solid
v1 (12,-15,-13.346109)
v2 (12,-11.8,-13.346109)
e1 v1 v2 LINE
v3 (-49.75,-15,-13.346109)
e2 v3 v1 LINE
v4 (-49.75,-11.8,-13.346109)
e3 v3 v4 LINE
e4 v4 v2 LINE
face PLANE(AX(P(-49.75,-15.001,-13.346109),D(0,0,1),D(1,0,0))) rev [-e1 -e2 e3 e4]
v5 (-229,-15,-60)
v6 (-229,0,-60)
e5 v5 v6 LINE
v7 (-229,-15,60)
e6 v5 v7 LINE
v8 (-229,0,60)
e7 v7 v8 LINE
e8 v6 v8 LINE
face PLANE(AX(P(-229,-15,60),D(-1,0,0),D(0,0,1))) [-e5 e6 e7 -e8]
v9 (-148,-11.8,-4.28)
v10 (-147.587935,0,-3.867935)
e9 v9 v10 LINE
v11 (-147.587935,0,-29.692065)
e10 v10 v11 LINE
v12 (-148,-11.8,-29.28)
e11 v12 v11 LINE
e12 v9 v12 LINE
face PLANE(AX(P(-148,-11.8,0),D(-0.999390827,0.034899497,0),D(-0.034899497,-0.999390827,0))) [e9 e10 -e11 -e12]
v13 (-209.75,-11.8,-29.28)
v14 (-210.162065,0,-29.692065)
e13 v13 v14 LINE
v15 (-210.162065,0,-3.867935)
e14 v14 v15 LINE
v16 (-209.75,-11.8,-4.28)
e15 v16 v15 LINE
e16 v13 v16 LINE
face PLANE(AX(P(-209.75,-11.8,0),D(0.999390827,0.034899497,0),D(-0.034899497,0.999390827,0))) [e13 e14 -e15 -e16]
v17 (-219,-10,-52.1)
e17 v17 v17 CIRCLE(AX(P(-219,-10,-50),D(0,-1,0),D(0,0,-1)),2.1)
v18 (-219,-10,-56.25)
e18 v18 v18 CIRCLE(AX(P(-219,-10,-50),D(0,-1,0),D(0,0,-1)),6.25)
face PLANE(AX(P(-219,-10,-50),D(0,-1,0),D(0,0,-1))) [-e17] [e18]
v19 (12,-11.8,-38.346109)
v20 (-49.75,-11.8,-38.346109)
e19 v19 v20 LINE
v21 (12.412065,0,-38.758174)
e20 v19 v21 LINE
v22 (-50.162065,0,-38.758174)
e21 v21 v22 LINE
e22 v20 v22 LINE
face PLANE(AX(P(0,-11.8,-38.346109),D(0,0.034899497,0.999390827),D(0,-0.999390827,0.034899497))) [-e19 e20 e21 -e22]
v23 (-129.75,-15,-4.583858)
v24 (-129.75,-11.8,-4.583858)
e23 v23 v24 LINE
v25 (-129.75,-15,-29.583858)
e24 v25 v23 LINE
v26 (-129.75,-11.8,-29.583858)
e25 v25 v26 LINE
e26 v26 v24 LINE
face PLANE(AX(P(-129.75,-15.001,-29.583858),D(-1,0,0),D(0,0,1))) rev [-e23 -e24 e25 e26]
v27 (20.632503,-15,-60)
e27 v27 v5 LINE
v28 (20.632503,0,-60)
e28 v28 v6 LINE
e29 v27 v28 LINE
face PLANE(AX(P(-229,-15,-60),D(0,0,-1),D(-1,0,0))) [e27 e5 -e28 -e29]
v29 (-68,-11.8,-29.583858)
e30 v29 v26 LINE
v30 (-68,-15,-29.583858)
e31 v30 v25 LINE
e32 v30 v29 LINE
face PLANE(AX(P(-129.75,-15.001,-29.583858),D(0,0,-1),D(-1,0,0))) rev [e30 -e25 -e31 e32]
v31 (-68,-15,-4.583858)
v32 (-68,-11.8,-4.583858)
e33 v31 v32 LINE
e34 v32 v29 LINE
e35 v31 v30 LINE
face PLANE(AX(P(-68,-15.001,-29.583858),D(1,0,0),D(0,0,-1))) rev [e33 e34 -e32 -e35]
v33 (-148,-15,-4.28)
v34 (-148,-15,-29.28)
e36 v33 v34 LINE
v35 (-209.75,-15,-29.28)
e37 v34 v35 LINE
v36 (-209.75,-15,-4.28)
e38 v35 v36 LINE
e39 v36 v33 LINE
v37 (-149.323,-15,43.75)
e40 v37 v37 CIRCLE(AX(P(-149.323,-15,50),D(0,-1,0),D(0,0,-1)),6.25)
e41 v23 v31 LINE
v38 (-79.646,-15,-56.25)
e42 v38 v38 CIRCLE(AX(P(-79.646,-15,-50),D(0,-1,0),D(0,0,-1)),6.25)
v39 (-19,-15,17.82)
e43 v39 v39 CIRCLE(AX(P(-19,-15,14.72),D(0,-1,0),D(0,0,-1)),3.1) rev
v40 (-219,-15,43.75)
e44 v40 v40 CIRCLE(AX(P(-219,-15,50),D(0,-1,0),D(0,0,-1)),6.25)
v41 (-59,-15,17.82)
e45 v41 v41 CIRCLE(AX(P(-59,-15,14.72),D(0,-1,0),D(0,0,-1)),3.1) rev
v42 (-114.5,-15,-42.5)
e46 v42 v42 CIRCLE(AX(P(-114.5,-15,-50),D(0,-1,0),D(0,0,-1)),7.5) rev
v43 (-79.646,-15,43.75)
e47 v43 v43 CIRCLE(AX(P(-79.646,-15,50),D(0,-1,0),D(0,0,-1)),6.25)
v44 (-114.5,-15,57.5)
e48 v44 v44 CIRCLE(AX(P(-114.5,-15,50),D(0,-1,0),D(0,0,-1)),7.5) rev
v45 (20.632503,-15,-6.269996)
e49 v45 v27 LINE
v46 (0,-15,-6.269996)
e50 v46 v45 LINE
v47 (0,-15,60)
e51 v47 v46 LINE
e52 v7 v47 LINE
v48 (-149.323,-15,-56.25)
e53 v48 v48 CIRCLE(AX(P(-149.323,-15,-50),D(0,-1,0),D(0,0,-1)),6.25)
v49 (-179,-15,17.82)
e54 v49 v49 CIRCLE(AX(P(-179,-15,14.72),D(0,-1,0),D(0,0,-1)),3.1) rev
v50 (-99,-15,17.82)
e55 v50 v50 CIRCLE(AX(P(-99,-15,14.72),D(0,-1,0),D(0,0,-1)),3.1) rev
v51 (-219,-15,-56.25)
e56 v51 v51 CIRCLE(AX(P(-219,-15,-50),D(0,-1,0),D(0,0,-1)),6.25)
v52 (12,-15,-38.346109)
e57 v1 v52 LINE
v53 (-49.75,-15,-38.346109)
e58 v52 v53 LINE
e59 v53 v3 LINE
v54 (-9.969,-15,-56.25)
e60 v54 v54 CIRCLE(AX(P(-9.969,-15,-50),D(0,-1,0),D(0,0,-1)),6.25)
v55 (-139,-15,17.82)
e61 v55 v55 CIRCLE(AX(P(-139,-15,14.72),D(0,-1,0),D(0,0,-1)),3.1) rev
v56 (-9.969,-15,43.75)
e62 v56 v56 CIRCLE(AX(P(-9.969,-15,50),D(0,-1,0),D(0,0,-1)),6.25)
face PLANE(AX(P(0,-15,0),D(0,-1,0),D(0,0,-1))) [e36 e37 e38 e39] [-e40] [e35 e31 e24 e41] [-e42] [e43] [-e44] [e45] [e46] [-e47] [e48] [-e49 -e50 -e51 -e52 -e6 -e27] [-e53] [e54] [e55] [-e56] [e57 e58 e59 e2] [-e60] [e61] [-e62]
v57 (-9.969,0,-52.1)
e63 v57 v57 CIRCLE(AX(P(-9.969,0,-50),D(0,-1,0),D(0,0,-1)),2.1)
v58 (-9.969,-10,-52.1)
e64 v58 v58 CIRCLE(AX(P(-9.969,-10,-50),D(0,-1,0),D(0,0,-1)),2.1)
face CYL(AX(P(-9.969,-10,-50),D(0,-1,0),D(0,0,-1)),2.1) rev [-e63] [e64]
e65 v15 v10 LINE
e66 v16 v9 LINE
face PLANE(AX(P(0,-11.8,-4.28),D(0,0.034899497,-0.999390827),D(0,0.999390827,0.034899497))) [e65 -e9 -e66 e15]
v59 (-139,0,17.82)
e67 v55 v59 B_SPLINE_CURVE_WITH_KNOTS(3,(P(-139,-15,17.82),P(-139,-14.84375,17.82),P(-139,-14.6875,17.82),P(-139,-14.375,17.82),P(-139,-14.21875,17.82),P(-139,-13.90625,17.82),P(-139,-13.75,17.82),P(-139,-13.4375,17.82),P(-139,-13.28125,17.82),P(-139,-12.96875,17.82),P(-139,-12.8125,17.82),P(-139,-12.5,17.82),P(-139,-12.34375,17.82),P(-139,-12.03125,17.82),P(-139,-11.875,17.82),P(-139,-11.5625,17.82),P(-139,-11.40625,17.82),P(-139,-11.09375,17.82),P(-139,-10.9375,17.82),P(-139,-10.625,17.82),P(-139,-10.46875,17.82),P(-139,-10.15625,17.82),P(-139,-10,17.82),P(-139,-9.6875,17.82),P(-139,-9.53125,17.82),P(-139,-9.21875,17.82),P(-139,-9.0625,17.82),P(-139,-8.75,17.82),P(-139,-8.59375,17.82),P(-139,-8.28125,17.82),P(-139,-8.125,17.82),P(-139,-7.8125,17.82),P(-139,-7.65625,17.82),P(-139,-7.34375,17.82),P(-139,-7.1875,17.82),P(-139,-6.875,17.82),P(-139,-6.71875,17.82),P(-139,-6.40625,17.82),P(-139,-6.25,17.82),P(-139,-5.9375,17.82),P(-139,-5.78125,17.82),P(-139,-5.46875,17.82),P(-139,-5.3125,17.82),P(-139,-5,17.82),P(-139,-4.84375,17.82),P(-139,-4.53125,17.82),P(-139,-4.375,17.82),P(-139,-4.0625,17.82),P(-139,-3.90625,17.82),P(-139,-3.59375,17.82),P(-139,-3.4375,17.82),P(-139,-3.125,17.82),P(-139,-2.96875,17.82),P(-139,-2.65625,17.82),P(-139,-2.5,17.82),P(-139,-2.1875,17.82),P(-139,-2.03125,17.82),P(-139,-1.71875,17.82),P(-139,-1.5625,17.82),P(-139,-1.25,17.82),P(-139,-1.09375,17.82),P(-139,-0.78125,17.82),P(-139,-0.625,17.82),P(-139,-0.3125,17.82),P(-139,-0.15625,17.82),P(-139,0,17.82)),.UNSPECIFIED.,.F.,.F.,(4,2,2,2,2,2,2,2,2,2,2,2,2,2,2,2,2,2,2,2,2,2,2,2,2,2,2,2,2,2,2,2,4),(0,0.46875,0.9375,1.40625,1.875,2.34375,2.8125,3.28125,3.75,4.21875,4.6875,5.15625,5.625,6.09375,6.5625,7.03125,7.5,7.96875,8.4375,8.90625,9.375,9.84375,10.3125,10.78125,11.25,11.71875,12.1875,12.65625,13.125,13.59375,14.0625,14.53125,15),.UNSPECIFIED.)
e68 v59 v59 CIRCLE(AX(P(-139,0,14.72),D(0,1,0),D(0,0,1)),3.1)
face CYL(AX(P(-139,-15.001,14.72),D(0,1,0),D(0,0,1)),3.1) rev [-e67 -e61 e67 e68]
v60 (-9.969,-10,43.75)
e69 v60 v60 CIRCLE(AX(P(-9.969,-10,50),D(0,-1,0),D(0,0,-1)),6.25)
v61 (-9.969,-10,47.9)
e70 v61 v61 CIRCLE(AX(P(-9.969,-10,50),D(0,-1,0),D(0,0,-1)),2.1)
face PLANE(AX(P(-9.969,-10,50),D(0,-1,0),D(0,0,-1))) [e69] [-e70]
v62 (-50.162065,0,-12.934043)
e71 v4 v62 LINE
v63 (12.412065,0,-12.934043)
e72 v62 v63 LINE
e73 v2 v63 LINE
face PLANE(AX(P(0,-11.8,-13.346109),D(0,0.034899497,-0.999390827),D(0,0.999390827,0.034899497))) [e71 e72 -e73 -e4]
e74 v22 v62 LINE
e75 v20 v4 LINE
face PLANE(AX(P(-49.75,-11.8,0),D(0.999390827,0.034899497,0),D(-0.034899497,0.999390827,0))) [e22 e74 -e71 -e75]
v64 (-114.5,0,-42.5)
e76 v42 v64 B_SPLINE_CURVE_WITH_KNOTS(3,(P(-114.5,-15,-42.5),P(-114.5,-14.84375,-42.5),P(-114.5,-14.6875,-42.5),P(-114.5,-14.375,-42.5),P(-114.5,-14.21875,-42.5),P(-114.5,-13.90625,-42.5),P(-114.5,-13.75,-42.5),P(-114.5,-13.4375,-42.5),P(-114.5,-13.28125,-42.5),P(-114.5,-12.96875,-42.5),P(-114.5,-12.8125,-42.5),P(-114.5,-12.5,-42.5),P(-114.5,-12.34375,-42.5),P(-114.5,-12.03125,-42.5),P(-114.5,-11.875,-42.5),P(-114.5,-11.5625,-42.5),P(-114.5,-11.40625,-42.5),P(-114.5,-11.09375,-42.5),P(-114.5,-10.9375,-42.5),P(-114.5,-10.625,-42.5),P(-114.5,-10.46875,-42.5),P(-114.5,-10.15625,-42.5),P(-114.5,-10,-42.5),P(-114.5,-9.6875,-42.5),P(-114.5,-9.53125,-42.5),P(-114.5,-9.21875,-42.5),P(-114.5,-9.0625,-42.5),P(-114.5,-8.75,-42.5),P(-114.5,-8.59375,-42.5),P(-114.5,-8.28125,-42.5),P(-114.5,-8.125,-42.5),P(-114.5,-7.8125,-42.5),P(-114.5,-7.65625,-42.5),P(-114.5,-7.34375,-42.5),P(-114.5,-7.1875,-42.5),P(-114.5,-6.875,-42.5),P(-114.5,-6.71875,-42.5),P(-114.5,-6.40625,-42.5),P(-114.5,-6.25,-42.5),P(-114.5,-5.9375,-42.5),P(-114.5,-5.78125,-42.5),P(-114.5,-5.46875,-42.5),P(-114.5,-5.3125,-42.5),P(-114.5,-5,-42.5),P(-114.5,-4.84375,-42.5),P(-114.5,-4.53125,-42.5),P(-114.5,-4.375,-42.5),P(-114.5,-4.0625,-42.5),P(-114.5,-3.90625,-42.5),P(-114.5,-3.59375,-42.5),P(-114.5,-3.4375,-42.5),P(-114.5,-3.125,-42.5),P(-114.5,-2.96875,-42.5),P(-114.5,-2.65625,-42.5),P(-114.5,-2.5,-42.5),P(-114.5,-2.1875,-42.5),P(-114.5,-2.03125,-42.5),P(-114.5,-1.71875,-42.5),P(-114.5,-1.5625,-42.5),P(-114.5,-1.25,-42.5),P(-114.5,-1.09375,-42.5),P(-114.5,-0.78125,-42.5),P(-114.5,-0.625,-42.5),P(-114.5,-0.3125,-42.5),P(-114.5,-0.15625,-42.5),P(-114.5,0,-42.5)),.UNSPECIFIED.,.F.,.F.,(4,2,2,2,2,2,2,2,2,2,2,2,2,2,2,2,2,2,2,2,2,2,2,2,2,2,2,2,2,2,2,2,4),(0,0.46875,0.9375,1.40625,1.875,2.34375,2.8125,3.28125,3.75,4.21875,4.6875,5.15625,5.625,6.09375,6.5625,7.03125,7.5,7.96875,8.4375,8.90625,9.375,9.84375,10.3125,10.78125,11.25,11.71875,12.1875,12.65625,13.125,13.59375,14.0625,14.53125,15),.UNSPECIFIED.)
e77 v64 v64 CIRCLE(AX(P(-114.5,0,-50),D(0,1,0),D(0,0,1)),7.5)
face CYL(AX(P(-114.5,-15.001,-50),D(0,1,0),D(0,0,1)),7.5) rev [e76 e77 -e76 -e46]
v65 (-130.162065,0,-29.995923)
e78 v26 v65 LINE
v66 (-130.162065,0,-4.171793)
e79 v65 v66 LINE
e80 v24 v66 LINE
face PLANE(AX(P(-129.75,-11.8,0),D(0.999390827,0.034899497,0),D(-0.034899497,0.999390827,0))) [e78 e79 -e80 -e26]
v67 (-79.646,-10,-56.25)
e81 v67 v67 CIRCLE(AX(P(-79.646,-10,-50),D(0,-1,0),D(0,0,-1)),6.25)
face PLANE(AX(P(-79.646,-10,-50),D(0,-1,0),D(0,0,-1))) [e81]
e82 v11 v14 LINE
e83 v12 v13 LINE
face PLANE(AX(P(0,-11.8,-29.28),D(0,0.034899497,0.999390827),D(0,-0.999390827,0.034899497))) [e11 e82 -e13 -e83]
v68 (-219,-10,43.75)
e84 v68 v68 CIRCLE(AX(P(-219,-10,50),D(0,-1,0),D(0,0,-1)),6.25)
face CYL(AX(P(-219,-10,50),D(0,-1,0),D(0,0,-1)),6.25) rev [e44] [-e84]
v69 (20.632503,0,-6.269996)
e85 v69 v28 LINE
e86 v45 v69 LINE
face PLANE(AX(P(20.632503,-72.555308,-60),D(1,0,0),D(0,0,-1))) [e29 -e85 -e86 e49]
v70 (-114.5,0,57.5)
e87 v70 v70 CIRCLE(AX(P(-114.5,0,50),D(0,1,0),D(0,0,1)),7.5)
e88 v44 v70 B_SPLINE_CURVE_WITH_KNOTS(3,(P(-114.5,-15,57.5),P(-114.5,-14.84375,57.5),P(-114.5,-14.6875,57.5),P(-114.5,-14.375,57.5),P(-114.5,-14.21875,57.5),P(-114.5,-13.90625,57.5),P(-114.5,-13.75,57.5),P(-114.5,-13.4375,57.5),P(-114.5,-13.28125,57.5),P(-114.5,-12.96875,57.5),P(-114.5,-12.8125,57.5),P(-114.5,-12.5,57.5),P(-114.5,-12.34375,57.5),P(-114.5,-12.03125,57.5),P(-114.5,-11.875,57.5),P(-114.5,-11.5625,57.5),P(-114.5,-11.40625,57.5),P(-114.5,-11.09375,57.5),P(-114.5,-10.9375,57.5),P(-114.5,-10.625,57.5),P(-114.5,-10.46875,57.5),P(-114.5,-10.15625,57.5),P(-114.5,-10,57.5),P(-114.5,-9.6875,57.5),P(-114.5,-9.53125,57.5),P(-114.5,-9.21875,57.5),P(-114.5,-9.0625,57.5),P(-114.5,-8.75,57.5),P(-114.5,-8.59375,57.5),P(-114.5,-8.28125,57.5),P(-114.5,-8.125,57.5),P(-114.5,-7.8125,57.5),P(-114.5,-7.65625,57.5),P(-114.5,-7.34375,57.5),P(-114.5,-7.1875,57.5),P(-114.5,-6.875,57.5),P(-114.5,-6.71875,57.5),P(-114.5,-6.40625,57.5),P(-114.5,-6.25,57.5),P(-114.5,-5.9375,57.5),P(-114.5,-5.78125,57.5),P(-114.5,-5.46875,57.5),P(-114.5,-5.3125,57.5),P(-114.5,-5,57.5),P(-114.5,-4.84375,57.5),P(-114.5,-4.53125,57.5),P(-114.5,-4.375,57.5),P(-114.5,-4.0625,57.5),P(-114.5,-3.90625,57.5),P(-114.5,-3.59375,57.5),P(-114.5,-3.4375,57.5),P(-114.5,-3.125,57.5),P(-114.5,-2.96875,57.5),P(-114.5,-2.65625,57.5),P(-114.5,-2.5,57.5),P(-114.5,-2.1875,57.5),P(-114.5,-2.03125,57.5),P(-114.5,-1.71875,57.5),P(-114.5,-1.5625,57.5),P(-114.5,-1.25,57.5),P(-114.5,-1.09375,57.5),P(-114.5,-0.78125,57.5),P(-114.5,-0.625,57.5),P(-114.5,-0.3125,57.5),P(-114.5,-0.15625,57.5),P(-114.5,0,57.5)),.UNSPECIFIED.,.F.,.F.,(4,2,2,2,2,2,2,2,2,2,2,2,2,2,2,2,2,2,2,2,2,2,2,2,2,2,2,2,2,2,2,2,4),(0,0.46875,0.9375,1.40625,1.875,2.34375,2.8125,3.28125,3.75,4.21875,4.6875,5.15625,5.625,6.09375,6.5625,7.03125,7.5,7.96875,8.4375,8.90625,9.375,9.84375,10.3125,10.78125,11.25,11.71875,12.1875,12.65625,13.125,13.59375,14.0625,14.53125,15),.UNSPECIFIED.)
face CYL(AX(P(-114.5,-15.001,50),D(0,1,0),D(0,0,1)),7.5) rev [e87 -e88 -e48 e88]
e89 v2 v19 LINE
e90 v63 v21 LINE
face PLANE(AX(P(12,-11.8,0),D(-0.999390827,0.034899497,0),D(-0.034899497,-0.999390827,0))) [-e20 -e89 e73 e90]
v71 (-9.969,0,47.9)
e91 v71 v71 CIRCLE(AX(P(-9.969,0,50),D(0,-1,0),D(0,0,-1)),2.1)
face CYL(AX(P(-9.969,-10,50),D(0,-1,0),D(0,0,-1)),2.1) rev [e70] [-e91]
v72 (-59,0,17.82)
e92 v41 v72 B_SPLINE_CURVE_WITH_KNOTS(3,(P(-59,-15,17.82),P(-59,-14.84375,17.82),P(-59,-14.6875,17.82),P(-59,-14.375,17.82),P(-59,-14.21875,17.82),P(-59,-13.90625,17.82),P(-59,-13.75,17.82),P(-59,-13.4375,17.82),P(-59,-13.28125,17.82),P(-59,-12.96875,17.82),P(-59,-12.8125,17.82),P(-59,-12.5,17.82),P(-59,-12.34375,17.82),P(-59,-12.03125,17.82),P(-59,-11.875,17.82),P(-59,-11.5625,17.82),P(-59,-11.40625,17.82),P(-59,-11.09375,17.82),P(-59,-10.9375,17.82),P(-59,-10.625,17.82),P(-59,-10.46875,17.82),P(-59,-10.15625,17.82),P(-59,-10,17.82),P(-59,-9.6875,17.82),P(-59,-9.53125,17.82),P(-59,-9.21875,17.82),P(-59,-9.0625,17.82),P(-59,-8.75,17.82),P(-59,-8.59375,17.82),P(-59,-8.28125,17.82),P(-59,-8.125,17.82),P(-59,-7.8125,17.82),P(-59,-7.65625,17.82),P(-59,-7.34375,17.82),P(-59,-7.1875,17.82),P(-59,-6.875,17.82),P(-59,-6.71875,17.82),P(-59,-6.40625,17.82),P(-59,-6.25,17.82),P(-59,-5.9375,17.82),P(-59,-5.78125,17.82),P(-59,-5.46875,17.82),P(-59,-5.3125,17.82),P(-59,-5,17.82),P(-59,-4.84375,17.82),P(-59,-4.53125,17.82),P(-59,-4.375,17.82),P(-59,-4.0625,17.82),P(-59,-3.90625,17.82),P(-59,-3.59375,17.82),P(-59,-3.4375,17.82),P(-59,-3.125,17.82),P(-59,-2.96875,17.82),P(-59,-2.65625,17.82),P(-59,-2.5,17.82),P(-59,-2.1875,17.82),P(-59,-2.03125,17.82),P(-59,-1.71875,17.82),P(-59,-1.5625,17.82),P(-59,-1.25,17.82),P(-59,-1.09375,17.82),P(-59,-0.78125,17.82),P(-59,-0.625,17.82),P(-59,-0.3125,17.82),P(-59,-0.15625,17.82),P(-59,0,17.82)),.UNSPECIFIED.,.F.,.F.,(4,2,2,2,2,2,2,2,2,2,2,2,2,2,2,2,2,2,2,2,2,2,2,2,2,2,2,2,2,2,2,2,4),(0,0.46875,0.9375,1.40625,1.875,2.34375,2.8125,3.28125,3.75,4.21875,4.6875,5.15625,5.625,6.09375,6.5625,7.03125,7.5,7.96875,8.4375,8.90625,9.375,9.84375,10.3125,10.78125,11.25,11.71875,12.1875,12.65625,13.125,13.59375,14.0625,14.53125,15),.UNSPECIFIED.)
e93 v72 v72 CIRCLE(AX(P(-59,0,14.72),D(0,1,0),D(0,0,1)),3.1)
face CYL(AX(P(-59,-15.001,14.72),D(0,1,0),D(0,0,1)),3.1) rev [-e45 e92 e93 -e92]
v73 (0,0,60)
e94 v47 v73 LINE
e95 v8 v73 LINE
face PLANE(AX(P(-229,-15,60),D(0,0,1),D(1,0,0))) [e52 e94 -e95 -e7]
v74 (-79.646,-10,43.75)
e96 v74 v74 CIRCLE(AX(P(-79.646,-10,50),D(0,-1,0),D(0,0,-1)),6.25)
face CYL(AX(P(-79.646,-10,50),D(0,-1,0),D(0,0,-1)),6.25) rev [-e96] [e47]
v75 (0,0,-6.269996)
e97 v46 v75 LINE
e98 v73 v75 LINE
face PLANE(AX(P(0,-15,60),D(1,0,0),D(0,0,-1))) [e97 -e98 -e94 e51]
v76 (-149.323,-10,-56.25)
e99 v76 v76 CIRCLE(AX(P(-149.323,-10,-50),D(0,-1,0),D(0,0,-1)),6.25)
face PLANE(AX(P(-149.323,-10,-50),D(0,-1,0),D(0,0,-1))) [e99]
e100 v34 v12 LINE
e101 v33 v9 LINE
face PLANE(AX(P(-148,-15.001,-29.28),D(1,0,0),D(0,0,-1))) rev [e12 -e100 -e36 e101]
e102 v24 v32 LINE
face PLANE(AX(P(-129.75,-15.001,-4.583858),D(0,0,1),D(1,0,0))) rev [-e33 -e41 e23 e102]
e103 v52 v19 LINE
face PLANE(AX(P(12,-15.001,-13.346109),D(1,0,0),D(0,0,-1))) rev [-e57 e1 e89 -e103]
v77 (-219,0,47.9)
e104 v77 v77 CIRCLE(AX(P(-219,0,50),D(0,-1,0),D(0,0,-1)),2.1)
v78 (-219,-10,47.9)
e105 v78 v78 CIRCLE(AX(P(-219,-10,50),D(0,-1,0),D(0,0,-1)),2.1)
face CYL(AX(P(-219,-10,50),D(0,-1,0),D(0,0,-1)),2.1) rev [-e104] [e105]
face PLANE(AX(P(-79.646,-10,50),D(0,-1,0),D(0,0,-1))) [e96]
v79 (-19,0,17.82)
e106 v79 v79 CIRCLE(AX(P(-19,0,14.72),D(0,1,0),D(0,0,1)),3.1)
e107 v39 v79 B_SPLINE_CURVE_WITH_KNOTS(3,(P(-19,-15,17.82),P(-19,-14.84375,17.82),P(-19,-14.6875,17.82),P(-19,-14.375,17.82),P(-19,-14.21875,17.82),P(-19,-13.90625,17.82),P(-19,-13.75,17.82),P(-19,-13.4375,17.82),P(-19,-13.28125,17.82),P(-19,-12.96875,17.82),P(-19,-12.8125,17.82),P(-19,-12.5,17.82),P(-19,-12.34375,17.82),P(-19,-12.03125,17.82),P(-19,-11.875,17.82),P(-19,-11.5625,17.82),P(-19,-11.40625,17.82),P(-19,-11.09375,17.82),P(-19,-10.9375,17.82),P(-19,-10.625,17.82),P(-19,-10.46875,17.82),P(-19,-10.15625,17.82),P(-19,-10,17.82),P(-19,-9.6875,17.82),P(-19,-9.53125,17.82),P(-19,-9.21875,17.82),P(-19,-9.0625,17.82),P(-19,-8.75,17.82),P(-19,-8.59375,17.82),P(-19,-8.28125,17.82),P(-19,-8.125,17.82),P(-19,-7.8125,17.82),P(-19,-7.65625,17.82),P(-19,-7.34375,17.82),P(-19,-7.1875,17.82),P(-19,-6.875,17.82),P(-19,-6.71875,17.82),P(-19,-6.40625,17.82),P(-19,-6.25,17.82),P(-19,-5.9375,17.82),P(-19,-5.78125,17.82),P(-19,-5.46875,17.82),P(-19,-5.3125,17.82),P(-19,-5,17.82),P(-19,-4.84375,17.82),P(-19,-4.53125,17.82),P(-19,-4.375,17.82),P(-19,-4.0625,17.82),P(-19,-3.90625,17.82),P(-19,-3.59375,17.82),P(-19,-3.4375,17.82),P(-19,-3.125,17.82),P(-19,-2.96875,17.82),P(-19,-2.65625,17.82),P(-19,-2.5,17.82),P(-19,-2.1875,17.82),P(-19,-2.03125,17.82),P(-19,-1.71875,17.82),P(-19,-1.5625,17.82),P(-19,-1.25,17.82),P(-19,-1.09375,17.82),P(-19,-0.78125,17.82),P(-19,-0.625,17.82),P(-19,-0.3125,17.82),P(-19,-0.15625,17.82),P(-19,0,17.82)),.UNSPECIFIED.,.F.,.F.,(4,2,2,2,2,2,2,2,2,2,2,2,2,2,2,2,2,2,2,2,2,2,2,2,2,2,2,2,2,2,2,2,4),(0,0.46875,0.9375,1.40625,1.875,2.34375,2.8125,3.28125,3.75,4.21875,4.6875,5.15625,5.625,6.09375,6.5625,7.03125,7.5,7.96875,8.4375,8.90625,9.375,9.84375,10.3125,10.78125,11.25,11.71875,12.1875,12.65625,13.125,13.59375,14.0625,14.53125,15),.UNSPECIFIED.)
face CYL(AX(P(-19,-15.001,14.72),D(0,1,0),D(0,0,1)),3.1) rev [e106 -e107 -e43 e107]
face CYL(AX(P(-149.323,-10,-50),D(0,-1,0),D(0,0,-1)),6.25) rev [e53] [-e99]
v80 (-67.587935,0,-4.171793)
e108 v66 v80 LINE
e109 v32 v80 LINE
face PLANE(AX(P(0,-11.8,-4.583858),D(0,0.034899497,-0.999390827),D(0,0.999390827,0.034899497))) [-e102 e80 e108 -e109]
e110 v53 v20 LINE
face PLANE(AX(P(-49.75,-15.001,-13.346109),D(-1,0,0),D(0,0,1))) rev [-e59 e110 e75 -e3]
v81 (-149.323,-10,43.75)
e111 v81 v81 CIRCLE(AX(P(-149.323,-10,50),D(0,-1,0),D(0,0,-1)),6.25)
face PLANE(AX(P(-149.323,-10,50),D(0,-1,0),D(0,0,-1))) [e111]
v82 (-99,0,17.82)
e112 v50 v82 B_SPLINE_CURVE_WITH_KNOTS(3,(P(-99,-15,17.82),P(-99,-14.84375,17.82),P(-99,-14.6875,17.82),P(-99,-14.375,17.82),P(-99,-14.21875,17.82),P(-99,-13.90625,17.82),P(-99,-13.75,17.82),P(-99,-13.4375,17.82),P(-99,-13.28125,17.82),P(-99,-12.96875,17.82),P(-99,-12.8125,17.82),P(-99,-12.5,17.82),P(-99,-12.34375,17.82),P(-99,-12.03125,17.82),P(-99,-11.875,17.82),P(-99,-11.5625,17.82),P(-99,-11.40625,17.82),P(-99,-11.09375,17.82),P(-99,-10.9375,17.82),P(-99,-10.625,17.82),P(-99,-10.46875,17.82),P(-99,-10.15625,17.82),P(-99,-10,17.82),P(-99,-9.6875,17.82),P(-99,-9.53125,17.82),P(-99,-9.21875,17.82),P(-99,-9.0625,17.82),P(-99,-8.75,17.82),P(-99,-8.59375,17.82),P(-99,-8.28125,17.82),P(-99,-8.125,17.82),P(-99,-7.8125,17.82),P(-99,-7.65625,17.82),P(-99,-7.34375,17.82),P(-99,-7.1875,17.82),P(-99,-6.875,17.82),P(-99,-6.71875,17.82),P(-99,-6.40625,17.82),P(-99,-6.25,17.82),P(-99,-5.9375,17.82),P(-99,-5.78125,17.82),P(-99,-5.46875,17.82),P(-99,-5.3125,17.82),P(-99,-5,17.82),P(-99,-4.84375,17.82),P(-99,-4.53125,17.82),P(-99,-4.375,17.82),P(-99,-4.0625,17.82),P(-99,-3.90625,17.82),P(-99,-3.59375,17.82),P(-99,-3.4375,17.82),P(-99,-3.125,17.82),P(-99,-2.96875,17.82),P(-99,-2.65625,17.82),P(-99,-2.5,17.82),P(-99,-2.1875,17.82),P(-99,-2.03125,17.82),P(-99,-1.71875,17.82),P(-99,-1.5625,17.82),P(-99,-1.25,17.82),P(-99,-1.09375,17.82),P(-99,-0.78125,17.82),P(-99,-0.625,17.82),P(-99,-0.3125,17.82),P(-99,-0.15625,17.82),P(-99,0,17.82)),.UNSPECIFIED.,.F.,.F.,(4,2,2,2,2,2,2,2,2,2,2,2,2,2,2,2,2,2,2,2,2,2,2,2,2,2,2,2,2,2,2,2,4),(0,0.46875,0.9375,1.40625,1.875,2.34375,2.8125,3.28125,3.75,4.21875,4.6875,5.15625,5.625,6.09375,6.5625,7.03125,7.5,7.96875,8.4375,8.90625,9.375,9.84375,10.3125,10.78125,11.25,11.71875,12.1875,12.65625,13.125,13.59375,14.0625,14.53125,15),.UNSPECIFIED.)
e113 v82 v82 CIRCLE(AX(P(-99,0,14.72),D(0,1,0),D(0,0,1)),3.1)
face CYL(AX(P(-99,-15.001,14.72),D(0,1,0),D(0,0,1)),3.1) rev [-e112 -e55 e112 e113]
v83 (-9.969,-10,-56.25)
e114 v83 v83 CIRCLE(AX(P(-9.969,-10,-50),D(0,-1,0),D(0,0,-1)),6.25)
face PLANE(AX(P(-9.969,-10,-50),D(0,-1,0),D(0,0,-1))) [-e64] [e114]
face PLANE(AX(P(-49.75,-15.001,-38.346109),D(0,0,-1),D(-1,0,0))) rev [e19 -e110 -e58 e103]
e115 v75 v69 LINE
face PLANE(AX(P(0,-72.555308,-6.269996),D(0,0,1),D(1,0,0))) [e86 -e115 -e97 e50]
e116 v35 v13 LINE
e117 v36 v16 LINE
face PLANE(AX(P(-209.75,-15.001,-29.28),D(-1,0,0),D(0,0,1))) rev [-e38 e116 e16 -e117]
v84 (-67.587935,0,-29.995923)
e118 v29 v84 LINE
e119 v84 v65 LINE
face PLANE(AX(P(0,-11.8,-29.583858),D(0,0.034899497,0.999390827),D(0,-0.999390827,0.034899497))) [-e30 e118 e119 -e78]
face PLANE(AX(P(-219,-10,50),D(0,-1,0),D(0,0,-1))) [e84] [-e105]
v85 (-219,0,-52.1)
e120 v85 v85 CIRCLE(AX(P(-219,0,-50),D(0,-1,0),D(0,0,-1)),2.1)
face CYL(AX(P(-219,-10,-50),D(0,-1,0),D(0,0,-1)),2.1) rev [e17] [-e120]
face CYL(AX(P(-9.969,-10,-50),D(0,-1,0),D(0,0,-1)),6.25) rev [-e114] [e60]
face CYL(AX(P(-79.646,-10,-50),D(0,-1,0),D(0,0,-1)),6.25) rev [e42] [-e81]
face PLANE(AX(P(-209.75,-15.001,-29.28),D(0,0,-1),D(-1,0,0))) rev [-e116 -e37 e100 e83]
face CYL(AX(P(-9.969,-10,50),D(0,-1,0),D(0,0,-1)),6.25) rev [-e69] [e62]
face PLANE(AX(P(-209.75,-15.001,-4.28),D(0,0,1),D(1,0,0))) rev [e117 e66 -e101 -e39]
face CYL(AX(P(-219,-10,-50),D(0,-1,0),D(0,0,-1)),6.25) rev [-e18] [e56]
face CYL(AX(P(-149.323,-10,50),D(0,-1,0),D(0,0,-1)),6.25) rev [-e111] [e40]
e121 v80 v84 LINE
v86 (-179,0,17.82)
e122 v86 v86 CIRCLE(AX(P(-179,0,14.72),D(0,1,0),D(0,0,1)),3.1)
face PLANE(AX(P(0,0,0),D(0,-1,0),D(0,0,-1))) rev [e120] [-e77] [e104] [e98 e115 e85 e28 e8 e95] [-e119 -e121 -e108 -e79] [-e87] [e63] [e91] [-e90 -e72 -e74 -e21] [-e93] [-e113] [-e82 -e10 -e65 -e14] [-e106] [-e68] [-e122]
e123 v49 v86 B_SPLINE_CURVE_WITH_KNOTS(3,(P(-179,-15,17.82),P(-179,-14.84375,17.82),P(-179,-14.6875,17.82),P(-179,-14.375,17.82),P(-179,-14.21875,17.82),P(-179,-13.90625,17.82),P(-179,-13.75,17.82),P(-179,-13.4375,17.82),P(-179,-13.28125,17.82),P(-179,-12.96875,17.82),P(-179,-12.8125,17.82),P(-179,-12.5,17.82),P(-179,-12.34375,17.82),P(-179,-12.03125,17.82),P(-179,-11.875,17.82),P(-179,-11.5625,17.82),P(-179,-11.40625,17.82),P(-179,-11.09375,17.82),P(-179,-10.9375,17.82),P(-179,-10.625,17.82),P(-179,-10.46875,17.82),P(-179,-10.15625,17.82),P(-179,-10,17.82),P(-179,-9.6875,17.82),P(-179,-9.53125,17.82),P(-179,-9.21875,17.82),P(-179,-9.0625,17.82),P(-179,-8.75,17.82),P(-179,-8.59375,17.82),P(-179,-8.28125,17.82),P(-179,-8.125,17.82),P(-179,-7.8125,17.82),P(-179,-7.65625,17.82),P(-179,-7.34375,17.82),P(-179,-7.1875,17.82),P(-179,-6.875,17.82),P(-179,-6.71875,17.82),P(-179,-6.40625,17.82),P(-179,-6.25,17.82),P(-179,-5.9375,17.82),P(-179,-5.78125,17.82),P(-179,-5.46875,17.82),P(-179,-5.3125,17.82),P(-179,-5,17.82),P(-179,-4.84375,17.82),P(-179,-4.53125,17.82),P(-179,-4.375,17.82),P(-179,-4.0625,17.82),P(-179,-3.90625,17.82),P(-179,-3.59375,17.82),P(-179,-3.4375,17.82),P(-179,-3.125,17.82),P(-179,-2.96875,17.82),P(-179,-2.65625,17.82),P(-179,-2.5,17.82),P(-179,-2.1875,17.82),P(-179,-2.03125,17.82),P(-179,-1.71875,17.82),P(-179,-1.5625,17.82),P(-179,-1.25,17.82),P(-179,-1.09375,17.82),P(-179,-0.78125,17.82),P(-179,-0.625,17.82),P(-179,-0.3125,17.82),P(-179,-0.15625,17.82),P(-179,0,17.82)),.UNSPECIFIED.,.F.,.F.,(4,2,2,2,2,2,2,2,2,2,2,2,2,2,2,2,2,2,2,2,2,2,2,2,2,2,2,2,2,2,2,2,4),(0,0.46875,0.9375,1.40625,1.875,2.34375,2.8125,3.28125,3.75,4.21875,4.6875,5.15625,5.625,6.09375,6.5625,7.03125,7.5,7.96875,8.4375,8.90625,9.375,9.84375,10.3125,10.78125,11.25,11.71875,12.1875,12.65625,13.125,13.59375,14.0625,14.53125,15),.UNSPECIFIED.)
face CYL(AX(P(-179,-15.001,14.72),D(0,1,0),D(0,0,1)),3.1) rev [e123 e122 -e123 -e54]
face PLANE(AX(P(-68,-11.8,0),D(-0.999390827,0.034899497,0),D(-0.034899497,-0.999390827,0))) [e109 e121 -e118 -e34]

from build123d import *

# Parameters (mm, degrees)
SKETCH1_W            = 229
SKETCH1_H            = 120
BOSS_EXTRUDE1_DEPTH  = 15
SKETCH2_W            = 20.632503002
SKETCH2_H            = 53.730004003
BOSS_EXTRUDE2_DEPTH  = 15
CUT_EXTRUDE1_REACH   = 239.205
SKETCH3_W            = 61.75
SKETCH3_H            = 25
CUT_EXTRUDE2_REACH   = 239.205
SKETCH4_W            = 61.75
SKETCH4_H            = 25
CUT_EXTRUDE5_REACH   = 239.205
SKETCH10_W           = 61.75
SKETCH10_H           = 25
CUT_EXTRUDE3_REACH   = 239.205
SKETCH5_R            = 7.5
SKETCH9_R            = 6.25
CUT_EXTRUDE4_DEPTH   = 5
LPATTERN2_COUNT      = 4
LPATTERN2_PITCH      = 69.677
LPATTERN2_COUNT_DIR2 = 2
LPATTERN2_PITCH_DIR2 = 100
M5_TAPPED_HOLE1_D    = 4.2
CUT_EXTRUDE6_REACH   = 239.205
SKETCH14_R           = 3.1


with BuildPart() as part:
    # Sketch1 → Boss-Extrude1 (new body)
    with BuildSketch(Plane(origin=(0, 0, 0), x_dir=(1, 0, 0), z_dir=(0, 1, 0))):
        with Locations((-114.5, 0)):
            Rectangle(SKETCH1_W, SKETCH1_H)
    extrude(amount=-BOSS_EXTRUDE1_DEPTH)

    # Sketch2 → Boss-Extrude2 (add)
    with BuildSketch(Plane(origin=(0, 0, 0), x_dir=(1, 0, 0), z_dir=(0, 1, 0))):
        with Locations((10.316251501, 33.134997999)):
            Rectangle(SKETCH2_W, SKETCH2_H)
    extrude(amount=-BOSS_EXTRUDE2_DEPTH)

    # Sketch3 → Cut-Extrude1 (cut, up to next)
    with BuildSketch(Plane(origin=(0, 0, 0), x_dir=(1, 0, 0), z_dir=(0, 1, 0)), mode=Mode.PRIVATE) as cut_extrude1_sk1:
        with Locations((-18.875, 25.846108513)):
            Rectangle(SKETCH3_W, SKETCH3_H)
    cut_extrude1_tool1 = extrude(cut_extrude1_sk1.sketch, amount=-CUT_EXTRUDE1_REACH, mode=Mode.PRIVATE) & part.part
    add(cut_extrude1_tool1.solids().sort_by_distance((-18.875, 0, -25.846109))[0], mode=Mode.SUBTRACT)

    # Sketch4 → Cut-Extrude2 (cut, up to next)
    with BuildSketch(Plane(origin=(0, 0, 0), x_dir=(1, 0, 0), z_dir=(0, 1, 0)), mode=Mode.PRIVATE) as cut_extrude2_sk1:
        with Locations((-98.875, 17.083858316)):
            Rectangle(SKETCH4_W, SKETCH4_H)
    cut_extrude2_tool1 = extrude(cut_extrude2_sk1.sketch, amount=-CUT_EXTRUDE2_REACH, mode=Mode.PRIVATE) & part.part
    add(cut_extrude2_tool1.solids().sort_by_distance((-98.875, 0, -17.083858))[0], mode=Mode.SUBTRACT)

    # Sketch10 → Cut-Extrude5 (cut, up to next)
    with BuildSketch(Plane(origin=(0, 0, 0), x_dir=(1, 0, 0), z_dir=(0, 1, 0)), mode=Mode.PRIVATE) as cut_extrude5_sk1:
        with Locations((-178.875, 16.78)):
            Rectangle(SKETCH10_W, SKETCH10_H)
    cut_extrude5_tool1 = extrude(cut_extrude5_sk1.sketch, amount=-CUT_EXTRUDE5_REACH, mode=Mode.PRIVATE) & part.part
    add(cut_extrude5_tool1.solids().sort_by_distance((-178.875, 0, -16.78))[0], mode=Mode.SUBTRACT)

    # Sketch5 → Cut-Extrude3 (cut, up to next)
    with BuildSketch(Plane(origin=(0, 0, 0), x_dir=(1, 0, 0), z_dir=(0, 1, 0)), mode=Mode.PRIVATE) as cut_extrude3_sk1:
        with Locations(Location((-114.5, 50, 0), (0, 0, 270))):
            Circle(SKETCH5_R)
    cut_extrude3_tool1 = extrude(cut_extrude3_sk1.sketch, amount=-CUT_EXTRUDE3_REACH, mode=Mode.PRIVATE) & part.part
    # Sketch5 → Cut-Extrude3 (cut, up to next)
    with BuildSketch(Plane(origin=(0, 0, 0), x_dir=(1, 0, 0), z_dir=(0, 1, 0)), mode=Mode.PRIVATE) as cut_extrude3_sk2:
        with Locations(Location((-114.5, -50, 0), (0, 0, 270))):
            Circle(SKETCH5_R)
    cut_extrude3_tool2 = extrude(cut_extrude3_sk2.sketch, amount=-CUT_EXTRUDE3_REACH, mode=Mode.PRIVATE) & part.part
    add(cut_extrude3_tool1.solids().sort_by_distance((-114.5, 0, -50))[0], mode=Mode.SUBTRACT)
    add(cut_extrude3_tool2.solids().sort_by_distance((-114.5, 0, 50))[0], mode=Mode.SUBTRACT)

    # Sketch9 → Cut-Extrude4 (cut)
    with BuildSketch(Plane.XZ.offset(15)):
        with Locations(Location((-219, -50, 0), (0, 0, 270))):
            Circle(SKETCH9_R)
    cut_extrude4 = extrude(amount=-CUT_EXTRUDE4_DEPTH, mode=Mode.SUBTRACT)

    # LPattern2: Cut-Extrude4 4 × 2
    with Locations(*[(i * LPATTERN2_PITCH, 0, j * LPATTERN2_PITCH_DIR2) for i in range(LPATTERN2_COUNT) for j in range(LPATTERN2_COUNT_DIR2) if (i, j) != (0, 0)]):
        add(cut_extrude4, mode=Mode.SUBTRACT)

    # M5 Tapped Hole1 (through all)
    with Locations(Plane(origin=(0, -10, 0), x_dir=(-1, 0, 0), z_dir=(0, -1, 0))):
        with Locations((9.969, 50), (219, 50), (219, -50), (9.969, -50)):
            Hole(M5_TAPPED_HOLE1_D / 2)

    # Draft1: read off the stored shape, not the designer's step
    # Draft1: loft between two sections, ruled curve by curve
    draft1_from = [
        Edge.make_line((-50.16206508, 0, -38.758173593), (-50.16206508, 0, -12.934043433)),
        Edge.make_line((12.41206508, 0, -38.758173593), (-50.16206508, 0, -38.758173593)),
        Edge.make_line((12.41206508, 0, -12.934043433), (12.41206508, 0, -38.758173593)),
        Edge.make_line((-50.16206508, 0, -12.934043433), (12.41206508, 0, -12.934043433)),
    ]
    draft1_to = [
        Edge.make_line((-49.75, -11.8, -38.346108513), (-49.75, -11.8, -13.346108513)),
        Edge.make_line((12, -11.8, -38.346108513), (-49.75, -11.8, -38.346108513)),
        Edge.make_line((12, -11.8, -13.346108513), (12, -11.8, -38.346108513)),
        Edge.make_line((-49.75, -11.8, -13.346108513), (12, -11.8, -13.346108513)),
    ]
    draft1 = Solid(Shell([*[Face.make_surface_from_curves(draft1_from[k], draft1_to[k]) for k in range(4)], Face(Wire(draft1_from)), Face(Wire(draft1_to))]))
    add(draft1, mode=Mode.SUBTRACT)

    # Draft1 2: loft between two sections, ruled curve by curve
    draft1_2_from = [
        Edge.make_line((-130.16206508, 0, -29.995923396), (-130.16206508, 0, -4.171793236)),
        Edge.make_line((-67.58793492, 0, -29.995923396), (-130.16206508, 0, -29.995923396)),
        Edge.make_line((-67.58793492, 0, -4.171793236), (-67.58793492, 0, -29.995923396)),
        Edge.make_line((-130.16206508, 0, -4.171793236), (-67.58793492, 0, -4.171793236)),
    ]
    draft1_2_to = [
        Edge.make_line((-129.75, -11.8, -29.583858316), (-129.75, -11.8, -4.583858316)),
        Edge.make_line((-68, -11.8, -29.583858316), (-129.75, -11.8, -29.583858316)),
        Edge.make_line((-68, -11.8, -4.583858316), (-68, -11.8, -29.583858316)),
        Edge.make_line((-129.75, -11.8, -4.583858316), (-68, -11.8, -4.583858316)),
    ]
    draft1_2 = Solid(Shell([*[Face.make_surface_from_curves(draft1_2_from[k], draft1_2_to[k]) for k in range(4)], Face(Wire(draft1_2_from)), Face(Wire(draft1_2_to))]))
    add(draft1_2, mode=Mode.SUBTRACT)

    # Draft1 3: loft between two sections, ruled curve by curve
    draft1_3_from = [
        Edge.make_line((-210.16206508, 0, -29.69206508), (-210.16206508, 0, -3.86793492)),
        Edge.make_line((-147.58793492, 0, -29.69206508), (-210.16206508, 0, -29.69206508)),
        Edge.make_line((-147.58793492, 0, -3.86793492), (-147.58793492, 0, -29.69206508)),
        Edge.make_line((-210.16206508, 0, -3.86793492), (-147.58793492, 0, -3.86793492)),
    ]
    draft1_3_to = [
        Edge.make_line((-209.75, -11.8, -29.28), (-209.75, -11.8, -4.28)),
        Edge.make_line((-148, -11.8, -29.28), (-209.75, -11.8, -29.28)),
        Edge.make_line((-148, -11.8, -4.28), (-148, -11.8, -29.28)),
        Edge.make_line((-209.75, -11.8, -4.28), (-148, -11.8, -4.28)),
    ]
    draft1_3 = Solid(Shell([*[Face.make_surface_from_curves(draft1_3_from[k], draft1_3_to[k]) for k in range(4)], Face(Wire(draft1_3_from)), Face(Wire(draft1_3_to))]))
    add(draft1_3, mode=Mode.SUBTRACT)

    # Sketch14 → Cut-Extrude6 (cut, up to next)
    with BuildSketch(Plane(origin=(0, 0, 0), x_dir=(1, 0, 0), z_dir=(0, 1, 0)), mode=Mode.PRIVATE) as cut_extrude6_sk1:
        with Locations(Location((-179, -14.72, 0), (0, 0, 270))):
            Circle(SKETCH14_R)
    cut_extrude6_tool1 = extrude(cut_extrude6_sk1.sketch, amount=-CUT_EXTRUDE6_REACH, mode=Mode.PRIVATE) & part.part
    # Sketch14 → Cut-Extrude6 (cut, up to next)
    with BuildSketch(Plane(origin=(0, 0, 0), x_dir=(1, 0, 0), z_dir=(0, 1, 0)), mode=Mode.PRIVATE) as cut_extrude6_sk2:
        with Locations(Location((-139, -14.72, 0), (0, 0, 270))):
            Circle(SKETCH14_R)
    cut_extrude6_tool2 = extrude(cut_extrude6_sk2.sketch, amount=-CUT_EXTRUDE6_REACH, mode=Mode.PRIVATE) & part.part
    # Sketch14 → Cut-Extrude6 (cut, up to next)
    with BuildSketch(Plane(origin=(0, 0, 0), x_dir=(1, 0, 0), z_dir=(0, 1, 0)), mode=Mode.PRIVATE) as cut_extrude6_sk3:
        with Locations(Location((-99, -14.72, 0), (0, 0, 270))):
            Circle(SKETCH14_R)
    cut_extrude6_tool3 = extrude(cut_extrude6_sk3.sketch, amount=-CUT_EXTRUDE6_REACH, mode=Mode.PRIVATE) & part.part
    # Sketch14 → Cut-Extrude6 (cut, up to next)
    with BuildSketch(Plane(origin=(0, 0, 0), x_dir=(1, 0, 0), z_dir=(0, 1, 0)), mode=Mode.PRIVATE) as cut_extrude6_sk4:
        with Locations(Location((-59, -14.72, 0), (0, 0, 270))):
            Circle(SKETCH14_R)
    cut_extrude6_tool4 = extrude(cut_extrude6_sk4.sketch, amount=-CUT_EXTRUDE6_REACH, mode=Mode.PRIVATE) & part.part
    # Sketch14 → Cut-Extrude6 (cut, up to next)
    with BuildSketch(Plane(origin=(0, 0, 0), x_dir=(1, 0, 0), z_dir=(0, 1, 0)), mode=Mode.PRIVATE) as cut_extrude6_sk5:
        with Locations(Location((-19, -14.72, 0), (0, 0, 270))):
            Circle(SKETCH14_R)
    cut_extrude6_tool5 = extrude(cut_extrude6_sk5.sketch, amount=-CUT_EXTRUDE6_REACH, mode=Mode.PRIVATE) & part.part
    add(cut_extrude6_tool1.solids().sort_by_distance((-179, 0, 14.72))[0], mode=Mode.SUBTRACT)
    add(cut_extrude6_tool2.solids().sort_by_distance((-139, 0, 14.72))[0], mode=Mode.SUBTRACT)
    add(cut_extrude6_tool3.solids().sort_by_distance((-99, 0, 14.72))[0], mode=Mode.SUBTRACT)
    add(cut_extrude6_tool4.solids().sort_by_distance((-59, 0, 14.72))[0], mode=Mode.SUBTRACT)
    add(cut_extrude6_tool5.solids().sort_by_distance((-19, 0, 14.72))[0], mode=Mode.SUBTRACT)


solid = part.part
